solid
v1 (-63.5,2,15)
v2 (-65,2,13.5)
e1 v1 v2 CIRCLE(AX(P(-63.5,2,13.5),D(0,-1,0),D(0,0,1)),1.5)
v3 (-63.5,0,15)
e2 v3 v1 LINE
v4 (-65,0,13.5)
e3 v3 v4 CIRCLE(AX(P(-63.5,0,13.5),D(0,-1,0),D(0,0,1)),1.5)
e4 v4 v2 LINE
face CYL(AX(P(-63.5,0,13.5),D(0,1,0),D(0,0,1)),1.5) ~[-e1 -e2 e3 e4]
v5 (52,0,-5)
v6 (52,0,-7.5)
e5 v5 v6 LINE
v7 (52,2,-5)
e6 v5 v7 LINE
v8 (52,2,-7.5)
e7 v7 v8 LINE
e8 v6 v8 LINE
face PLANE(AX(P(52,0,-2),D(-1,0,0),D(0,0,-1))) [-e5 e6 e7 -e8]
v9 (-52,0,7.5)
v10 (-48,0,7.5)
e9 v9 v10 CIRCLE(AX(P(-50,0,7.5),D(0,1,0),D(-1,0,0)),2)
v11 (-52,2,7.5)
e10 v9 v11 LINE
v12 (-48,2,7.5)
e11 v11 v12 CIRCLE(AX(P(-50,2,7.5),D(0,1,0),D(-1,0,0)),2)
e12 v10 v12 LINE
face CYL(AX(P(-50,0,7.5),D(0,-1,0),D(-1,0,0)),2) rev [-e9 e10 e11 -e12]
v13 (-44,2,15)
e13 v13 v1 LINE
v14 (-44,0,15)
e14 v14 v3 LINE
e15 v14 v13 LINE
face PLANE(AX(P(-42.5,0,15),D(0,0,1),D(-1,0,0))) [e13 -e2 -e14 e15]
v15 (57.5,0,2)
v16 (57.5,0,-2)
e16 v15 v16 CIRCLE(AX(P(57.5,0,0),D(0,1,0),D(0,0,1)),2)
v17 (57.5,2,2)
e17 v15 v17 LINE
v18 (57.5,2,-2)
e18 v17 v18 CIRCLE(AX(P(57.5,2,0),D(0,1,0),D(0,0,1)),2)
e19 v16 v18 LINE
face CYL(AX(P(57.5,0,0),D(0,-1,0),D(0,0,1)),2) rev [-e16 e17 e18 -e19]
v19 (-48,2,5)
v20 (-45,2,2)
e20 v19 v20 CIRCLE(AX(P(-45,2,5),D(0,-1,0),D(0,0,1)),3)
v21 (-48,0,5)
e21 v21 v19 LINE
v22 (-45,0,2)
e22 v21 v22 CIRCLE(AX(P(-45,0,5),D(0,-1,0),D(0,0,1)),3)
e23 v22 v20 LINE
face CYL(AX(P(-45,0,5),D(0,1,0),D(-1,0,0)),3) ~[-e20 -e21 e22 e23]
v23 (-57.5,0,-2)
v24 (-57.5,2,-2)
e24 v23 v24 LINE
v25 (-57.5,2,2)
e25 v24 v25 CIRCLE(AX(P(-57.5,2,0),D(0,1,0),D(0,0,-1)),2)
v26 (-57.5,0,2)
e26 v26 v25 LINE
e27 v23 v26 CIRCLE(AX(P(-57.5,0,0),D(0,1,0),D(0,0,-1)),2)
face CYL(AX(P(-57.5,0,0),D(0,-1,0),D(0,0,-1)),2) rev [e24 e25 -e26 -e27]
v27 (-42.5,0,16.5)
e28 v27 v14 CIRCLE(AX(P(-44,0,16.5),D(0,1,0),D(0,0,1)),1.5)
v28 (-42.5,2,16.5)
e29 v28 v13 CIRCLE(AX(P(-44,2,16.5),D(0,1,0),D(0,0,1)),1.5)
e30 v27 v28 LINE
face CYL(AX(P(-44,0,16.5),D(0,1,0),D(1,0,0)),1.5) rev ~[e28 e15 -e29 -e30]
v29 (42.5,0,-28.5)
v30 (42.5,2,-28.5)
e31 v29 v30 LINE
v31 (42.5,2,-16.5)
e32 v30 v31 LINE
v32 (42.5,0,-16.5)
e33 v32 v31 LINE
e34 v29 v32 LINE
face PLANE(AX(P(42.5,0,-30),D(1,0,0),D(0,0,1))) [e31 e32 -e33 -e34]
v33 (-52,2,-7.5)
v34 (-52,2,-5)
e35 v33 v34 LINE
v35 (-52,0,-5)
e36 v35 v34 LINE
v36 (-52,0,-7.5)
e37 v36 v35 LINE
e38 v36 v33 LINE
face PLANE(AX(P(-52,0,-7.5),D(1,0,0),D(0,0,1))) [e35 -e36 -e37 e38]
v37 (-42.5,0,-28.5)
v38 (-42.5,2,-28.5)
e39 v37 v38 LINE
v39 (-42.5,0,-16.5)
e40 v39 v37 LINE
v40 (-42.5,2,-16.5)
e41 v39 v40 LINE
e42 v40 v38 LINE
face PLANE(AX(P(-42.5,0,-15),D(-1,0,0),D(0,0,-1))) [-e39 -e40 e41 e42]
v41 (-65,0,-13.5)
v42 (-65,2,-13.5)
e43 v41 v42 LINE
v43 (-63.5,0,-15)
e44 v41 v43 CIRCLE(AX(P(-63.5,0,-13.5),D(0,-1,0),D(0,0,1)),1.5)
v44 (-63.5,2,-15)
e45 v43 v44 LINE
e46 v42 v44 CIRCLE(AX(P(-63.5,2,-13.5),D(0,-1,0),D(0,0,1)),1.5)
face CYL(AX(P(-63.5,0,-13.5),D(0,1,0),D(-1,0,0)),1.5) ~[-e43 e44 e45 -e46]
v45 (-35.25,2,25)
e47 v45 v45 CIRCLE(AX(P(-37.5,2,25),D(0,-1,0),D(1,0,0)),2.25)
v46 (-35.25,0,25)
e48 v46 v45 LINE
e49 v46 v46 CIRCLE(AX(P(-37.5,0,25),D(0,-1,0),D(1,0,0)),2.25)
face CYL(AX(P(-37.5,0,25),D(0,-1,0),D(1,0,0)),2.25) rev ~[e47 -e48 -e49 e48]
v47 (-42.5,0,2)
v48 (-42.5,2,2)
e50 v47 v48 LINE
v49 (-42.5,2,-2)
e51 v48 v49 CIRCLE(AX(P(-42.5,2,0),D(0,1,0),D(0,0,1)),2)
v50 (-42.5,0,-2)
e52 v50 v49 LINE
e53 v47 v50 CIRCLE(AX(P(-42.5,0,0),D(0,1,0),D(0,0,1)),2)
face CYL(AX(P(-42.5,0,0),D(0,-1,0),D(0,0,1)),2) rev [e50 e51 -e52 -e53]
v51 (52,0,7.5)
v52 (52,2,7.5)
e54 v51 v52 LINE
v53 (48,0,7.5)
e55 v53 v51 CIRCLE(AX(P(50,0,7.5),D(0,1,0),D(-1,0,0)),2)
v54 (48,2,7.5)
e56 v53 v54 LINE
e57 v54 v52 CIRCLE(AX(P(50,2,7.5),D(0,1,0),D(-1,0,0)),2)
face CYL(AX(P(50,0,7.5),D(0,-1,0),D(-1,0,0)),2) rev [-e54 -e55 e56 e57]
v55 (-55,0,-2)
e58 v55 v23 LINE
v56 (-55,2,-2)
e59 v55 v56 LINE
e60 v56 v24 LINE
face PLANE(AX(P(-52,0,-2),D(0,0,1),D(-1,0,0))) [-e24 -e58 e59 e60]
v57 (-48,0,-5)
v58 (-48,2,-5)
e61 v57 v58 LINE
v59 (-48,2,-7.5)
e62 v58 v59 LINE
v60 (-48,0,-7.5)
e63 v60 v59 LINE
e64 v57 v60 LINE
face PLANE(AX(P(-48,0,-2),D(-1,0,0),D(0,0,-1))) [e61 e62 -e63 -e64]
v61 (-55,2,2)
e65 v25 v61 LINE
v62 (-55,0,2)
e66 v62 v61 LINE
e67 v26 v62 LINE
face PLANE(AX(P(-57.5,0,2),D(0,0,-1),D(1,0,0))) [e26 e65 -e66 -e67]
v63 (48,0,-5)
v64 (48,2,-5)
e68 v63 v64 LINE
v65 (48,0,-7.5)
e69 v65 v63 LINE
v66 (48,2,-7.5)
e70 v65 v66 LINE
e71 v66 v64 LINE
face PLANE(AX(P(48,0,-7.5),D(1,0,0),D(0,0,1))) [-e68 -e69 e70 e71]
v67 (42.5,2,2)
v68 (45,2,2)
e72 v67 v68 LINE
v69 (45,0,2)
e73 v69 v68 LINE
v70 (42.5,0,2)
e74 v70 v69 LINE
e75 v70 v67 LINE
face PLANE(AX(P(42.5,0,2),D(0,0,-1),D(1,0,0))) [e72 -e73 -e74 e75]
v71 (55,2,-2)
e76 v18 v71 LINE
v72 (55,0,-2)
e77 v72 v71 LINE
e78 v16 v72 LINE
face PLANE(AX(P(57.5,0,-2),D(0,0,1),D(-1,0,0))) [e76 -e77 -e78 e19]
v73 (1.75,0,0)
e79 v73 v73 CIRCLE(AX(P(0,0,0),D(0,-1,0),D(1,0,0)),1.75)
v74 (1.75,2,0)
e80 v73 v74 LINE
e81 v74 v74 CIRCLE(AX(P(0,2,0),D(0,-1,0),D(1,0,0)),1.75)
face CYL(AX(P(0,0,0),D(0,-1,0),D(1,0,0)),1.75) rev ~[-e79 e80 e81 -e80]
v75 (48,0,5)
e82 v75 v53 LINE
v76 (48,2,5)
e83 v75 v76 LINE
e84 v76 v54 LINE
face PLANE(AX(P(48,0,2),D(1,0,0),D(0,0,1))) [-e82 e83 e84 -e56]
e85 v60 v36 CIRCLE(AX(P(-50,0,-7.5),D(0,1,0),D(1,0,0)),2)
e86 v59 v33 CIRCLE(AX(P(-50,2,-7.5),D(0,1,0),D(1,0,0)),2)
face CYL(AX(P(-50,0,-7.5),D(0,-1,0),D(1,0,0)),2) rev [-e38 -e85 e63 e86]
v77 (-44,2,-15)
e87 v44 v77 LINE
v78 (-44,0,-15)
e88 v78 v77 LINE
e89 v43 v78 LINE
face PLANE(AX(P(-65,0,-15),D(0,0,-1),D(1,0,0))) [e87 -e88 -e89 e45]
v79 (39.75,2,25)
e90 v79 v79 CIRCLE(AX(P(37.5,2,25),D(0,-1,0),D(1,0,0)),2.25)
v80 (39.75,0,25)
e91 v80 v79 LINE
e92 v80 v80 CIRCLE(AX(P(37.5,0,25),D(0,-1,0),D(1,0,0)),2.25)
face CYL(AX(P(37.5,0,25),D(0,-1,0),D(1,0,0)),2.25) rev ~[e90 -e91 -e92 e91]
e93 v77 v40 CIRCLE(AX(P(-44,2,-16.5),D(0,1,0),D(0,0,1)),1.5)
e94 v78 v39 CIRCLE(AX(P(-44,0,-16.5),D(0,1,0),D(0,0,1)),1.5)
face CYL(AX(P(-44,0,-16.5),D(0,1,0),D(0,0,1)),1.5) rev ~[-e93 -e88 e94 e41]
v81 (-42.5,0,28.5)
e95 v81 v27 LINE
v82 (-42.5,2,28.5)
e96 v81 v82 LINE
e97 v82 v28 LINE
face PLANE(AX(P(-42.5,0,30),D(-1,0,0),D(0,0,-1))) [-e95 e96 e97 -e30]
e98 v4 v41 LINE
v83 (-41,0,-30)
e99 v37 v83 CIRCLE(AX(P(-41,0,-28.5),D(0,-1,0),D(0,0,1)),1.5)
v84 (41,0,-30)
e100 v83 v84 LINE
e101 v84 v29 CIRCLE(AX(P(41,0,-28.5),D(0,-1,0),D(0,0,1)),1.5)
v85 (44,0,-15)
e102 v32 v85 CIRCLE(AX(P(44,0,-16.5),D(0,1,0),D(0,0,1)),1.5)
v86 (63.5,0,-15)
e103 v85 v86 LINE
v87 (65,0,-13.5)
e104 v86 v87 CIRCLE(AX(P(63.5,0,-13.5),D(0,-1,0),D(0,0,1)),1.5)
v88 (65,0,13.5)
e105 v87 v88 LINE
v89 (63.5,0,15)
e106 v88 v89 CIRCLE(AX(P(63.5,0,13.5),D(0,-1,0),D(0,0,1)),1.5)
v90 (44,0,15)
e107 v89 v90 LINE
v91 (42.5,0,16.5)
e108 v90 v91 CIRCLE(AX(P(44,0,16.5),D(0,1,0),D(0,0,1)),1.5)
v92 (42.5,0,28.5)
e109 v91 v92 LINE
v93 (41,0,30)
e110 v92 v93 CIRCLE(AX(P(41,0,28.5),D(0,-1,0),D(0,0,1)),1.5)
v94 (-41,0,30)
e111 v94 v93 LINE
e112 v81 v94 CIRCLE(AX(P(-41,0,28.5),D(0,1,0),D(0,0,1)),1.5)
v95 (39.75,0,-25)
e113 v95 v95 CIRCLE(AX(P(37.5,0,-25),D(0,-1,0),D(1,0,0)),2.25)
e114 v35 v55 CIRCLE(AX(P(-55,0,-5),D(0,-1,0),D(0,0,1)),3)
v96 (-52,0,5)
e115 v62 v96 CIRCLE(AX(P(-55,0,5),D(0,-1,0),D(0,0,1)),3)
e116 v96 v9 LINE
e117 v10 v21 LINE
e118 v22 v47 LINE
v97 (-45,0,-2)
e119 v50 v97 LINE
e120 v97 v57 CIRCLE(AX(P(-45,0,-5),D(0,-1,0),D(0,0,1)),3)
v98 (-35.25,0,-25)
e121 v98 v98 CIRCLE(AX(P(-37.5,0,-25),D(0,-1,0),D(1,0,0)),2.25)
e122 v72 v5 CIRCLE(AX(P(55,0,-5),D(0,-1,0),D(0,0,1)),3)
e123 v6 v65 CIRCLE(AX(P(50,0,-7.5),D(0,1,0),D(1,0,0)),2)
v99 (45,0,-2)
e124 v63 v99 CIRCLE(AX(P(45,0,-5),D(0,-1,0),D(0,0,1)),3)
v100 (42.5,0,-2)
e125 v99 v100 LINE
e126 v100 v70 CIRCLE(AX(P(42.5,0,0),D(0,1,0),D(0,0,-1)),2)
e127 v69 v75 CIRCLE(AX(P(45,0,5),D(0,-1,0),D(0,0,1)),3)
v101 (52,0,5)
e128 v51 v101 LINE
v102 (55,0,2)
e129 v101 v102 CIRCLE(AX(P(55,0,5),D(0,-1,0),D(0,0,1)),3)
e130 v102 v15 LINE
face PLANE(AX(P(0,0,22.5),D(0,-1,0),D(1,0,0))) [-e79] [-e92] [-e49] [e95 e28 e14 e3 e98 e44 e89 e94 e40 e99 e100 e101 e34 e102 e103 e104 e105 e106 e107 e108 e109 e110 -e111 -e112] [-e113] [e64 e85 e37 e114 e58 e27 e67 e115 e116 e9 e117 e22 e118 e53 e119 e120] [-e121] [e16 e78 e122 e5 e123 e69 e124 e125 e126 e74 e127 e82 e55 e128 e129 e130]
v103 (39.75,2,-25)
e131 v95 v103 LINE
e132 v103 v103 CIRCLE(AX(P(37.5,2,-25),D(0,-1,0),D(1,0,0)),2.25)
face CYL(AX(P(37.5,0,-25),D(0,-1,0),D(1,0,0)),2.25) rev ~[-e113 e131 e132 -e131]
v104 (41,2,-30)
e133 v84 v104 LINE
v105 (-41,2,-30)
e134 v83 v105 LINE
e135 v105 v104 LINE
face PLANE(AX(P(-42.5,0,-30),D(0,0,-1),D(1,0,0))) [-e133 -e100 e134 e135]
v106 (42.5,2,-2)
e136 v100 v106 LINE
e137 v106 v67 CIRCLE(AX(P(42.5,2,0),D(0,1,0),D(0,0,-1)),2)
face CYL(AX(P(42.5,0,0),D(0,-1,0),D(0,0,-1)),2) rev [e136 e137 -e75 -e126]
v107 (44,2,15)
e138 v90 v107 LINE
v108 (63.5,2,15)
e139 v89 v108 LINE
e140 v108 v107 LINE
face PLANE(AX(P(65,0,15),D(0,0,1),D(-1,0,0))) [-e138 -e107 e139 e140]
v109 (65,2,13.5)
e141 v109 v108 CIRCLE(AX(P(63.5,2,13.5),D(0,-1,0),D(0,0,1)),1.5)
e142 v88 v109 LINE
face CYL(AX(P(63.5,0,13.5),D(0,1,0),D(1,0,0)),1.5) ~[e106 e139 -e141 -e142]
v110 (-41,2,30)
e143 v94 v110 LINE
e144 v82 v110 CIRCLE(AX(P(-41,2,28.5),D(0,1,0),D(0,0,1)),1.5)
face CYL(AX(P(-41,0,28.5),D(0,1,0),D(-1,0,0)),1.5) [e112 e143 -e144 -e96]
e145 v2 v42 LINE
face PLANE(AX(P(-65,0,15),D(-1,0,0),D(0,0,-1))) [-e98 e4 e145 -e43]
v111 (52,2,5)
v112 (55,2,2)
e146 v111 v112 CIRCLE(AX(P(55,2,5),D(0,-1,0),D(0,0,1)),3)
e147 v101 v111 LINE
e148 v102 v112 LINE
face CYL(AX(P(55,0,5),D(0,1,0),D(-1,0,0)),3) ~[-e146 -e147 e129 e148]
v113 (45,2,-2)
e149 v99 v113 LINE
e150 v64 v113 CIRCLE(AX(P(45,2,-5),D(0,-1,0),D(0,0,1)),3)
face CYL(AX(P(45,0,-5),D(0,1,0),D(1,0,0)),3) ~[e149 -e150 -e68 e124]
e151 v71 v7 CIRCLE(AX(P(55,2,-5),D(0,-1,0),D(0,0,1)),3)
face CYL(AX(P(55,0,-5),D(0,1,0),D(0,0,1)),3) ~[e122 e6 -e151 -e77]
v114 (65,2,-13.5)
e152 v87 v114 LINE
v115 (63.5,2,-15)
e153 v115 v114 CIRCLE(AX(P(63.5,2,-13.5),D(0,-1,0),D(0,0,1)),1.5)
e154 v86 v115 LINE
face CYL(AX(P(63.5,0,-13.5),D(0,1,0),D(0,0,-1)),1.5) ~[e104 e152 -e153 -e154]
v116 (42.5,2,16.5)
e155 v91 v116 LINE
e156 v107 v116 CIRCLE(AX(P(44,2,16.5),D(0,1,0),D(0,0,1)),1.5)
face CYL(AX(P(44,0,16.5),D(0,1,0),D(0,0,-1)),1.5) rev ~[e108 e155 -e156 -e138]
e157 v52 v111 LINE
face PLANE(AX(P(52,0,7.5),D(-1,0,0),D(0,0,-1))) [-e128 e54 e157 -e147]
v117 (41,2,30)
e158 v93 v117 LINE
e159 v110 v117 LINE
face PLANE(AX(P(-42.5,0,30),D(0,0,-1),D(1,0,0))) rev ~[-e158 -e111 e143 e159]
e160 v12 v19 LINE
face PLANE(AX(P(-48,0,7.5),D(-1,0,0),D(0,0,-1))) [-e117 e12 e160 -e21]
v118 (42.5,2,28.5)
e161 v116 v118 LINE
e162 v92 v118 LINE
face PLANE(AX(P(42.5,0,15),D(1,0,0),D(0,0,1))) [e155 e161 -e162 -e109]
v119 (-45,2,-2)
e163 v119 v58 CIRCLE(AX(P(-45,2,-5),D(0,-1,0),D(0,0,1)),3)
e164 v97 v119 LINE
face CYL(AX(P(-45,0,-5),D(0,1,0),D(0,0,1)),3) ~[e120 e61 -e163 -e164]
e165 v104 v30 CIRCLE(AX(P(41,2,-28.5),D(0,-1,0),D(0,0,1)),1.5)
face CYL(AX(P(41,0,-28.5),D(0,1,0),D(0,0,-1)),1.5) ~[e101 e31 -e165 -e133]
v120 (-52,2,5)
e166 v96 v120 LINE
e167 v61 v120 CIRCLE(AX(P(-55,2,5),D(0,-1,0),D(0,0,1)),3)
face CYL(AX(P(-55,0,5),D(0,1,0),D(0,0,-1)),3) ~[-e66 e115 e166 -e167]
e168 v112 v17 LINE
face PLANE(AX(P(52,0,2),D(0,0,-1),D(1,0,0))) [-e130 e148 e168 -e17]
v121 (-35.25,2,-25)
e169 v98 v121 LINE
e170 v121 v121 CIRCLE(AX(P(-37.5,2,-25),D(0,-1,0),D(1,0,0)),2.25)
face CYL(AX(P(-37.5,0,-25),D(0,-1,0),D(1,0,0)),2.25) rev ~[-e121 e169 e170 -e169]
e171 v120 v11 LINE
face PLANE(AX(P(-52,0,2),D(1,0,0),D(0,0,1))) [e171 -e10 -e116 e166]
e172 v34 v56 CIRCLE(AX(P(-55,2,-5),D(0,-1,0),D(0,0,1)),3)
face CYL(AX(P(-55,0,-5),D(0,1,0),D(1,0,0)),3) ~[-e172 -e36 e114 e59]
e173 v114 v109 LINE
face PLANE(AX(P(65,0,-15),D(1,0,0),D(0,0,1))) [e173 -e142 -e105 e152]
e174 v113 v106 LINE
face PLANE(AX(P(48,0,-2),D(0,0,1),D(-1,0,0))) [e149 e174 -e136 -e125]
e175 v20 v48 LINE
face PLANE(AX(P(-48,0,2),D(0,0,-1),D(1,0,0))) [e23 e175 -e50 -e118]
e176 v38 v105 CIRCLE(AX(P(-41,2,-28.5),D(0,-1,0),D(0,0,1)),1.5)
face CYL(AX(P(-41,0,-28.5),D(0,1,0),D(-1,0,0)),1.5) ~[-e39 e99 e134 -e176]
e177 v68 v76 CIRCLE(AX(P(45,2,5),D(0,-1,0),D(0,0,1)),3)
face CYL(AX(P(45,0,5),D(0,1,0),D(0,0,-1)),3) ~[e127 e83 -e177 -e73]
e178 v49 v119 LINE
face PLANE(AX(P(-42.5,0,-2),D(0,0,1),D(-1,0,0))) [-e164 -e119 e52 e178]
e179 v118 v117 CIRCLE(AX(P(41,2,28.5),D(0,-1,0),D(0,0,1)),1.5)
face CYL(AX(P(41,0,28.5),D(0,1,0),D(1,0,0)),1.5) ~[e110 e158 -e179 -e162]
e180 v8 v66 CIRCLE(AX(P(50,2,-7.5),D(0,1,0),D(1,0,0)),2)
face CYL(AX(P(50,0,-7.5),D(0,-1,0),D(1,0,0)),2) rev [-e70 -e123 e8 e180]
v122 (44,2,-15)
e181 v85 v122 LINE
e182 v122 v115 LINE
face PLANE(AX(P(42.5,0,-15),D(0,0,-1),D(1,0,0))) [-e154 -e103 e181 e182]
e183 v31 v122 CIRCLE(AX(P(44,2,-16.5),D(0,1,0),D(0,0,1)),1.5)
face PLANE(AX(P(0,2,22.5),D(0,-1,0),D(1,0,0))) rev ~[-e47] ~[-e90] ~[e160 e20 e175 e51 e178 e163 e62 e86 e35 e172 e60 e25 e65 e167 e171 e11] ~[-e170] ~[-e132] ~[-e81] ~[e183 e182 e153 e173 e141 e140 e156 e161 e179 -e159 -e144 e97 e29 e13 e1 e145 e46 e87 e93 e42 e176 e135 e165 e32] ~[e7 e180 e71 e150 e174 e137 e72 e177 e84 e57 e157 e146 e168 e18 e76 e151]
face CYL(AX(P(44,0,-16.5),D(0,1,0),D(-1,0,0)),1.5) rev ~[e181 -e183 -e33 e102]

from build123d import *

# Parameters (mm, degrees)
F0_W     = 85
F0_H     = 15
F0_R     = 2.25
F0_R_2   = 1.75
F1_DEPTH = 2
F2_R     = 1.5
F3_R     = 3


# Not quite as in the source:
# - a feature names something its author has since deleted; it is built from what else it names


with BuildPart() as f1:
    # F0 (on Front) → F1 (new body)
    with BuildSketch(Plane.XZ):
        with Locations((0, 22.5)):
            Rectangle(F0_W, F0_H)
        with Locations((-37.5, 25)):
            Circle(F0_R, mode=Mode.SUBTRACT)
        with Locations((37.5, 25)):
            Circle(F0_R, mode=Mode.SUBTRACT)
        with Locations((0, -22.5)):
            Rectangle(F0_W, F0_H)
        with Locations((-37.5, -25)):
            Circle(F0_R, mode=Mode.SUBTRACT)
        with Locations((37.5, -25)):
            Circle(F0_R, mode=Mode.SUBTRACT)
        with BuildLine():
            Line((-42.5, -2), (-42.5, -15))
            Line((-42.5, -15), (42.5, -15))
            Line((42.5, -15), (42.5, -2))
            ThreePointArc((42.5, -2), (40.5, 0), (42.5, 2))
            Line((42.5, 2), (42.5, 15))
            Line((42.5, 15), (-42.5, 15))
            Line((-42.5, 15), (-42.5, 2))
            ThreePointArc((-42.5, 2), (-40.5, 0), (-42.5, -2))
        make_face()
        Circle(F0_R_2, mode=Mode.SUBTRACT)
        with BuildLine():
            Line((-65, -15), (-42.5, -15))
            Line((-42.5, -15), (-42.5, -2))
            Line((-42.5, -2), (-48, -2))
            Line((-48, -2), (-48, -7.5))
            ThreePointArc((-48, -7.5), (-50, -9.5), (-52, -7.5))
            Line((-52, -7.5), (-52, -2))
            Line((-52, -2), (-57.5, -2))
            ThreePointArc((-57.5, -2), (-59.5, 0), (-57.5, 2))
            Line((-57.5, 2), (-52, 2))
            Line((-52, 2), (-52, 7.5))
            ThreePointArc((-52, 7.5), (-50, 9.5), (-48, 7.5))
            Line((-48, 7.5), (-48, 2))
            Line((-48, 2), (-42.5, 2))
            Line((-42.5, 2), (-42.5, 15))
            Line((-42.5, 15), (-65, 15))
            Line((-65, 15), (-65, -15))
        make_face()
        with BuildLine():
            Line((42.5, -2), (42.5, -15))
            Line((42.5, -15), (65, -15))
            Line((65, -15), (65, 15))
            Line((65, 15), (42.5, 15))
            Line((42.5, 15), (42.5, 2))
            Line((42.5, 2), (48, 2))
            Line((48, 2), (48, 7.5))
            ThreePointArc((48, 7.5), (50, 9.5), (52, 7.5))
            Line((52, 7.5), (52, 2))
            Line((52, 2), (57.5, 2))
            ThreePointArc((57.5, 2), (59.5, 0), (57.5, -2))
            Line((57.5, -2), (52, -2))
            Line((52, -2), (52, -7.5))
            ThreePointArc((52, -7.5), (50, -9.5), (48, -7.5))
            Line((48, -7.5), (48, -2))
            Line((48, -2), (42.5, -2))
        make_face()
    extrude(amount=-F1_DEPTH)

    # F2
    f2_edges = [f1.edges().sort_by_distance(p)[0] for p in [
        (-42.5, 1, 30),
        (42.5, 1, 30),
        (42.5, 1, -30),
        (-42.5, 1, -30),
        (-42.5, 1, 15),
        (-65, 1, 15),
        (-65, 1, -15),
        (-42.5, 1, -15),
        (42.5, 1, 15),
        (65, 1, 15),
        (42.5, 1, -15),
        (65, 1, -15),
    ]]
    fillet(f2_edges, radius=F2_R)

    # F3
    f3_edges = [f1.edges().sort_by_distance(p)[0] for p in [
        (48, 1, 2),
        (52, 1, 2),
        (48, 1, -2),
        (52, 1, -2),
        (-48, 1, 2),
        (-52, 1, 2),
        (-48, 1, -2),
        (-52, 1, -2),
    ]]
    fillet(f3_edges, radius=F3_R)


solid = f1.part
